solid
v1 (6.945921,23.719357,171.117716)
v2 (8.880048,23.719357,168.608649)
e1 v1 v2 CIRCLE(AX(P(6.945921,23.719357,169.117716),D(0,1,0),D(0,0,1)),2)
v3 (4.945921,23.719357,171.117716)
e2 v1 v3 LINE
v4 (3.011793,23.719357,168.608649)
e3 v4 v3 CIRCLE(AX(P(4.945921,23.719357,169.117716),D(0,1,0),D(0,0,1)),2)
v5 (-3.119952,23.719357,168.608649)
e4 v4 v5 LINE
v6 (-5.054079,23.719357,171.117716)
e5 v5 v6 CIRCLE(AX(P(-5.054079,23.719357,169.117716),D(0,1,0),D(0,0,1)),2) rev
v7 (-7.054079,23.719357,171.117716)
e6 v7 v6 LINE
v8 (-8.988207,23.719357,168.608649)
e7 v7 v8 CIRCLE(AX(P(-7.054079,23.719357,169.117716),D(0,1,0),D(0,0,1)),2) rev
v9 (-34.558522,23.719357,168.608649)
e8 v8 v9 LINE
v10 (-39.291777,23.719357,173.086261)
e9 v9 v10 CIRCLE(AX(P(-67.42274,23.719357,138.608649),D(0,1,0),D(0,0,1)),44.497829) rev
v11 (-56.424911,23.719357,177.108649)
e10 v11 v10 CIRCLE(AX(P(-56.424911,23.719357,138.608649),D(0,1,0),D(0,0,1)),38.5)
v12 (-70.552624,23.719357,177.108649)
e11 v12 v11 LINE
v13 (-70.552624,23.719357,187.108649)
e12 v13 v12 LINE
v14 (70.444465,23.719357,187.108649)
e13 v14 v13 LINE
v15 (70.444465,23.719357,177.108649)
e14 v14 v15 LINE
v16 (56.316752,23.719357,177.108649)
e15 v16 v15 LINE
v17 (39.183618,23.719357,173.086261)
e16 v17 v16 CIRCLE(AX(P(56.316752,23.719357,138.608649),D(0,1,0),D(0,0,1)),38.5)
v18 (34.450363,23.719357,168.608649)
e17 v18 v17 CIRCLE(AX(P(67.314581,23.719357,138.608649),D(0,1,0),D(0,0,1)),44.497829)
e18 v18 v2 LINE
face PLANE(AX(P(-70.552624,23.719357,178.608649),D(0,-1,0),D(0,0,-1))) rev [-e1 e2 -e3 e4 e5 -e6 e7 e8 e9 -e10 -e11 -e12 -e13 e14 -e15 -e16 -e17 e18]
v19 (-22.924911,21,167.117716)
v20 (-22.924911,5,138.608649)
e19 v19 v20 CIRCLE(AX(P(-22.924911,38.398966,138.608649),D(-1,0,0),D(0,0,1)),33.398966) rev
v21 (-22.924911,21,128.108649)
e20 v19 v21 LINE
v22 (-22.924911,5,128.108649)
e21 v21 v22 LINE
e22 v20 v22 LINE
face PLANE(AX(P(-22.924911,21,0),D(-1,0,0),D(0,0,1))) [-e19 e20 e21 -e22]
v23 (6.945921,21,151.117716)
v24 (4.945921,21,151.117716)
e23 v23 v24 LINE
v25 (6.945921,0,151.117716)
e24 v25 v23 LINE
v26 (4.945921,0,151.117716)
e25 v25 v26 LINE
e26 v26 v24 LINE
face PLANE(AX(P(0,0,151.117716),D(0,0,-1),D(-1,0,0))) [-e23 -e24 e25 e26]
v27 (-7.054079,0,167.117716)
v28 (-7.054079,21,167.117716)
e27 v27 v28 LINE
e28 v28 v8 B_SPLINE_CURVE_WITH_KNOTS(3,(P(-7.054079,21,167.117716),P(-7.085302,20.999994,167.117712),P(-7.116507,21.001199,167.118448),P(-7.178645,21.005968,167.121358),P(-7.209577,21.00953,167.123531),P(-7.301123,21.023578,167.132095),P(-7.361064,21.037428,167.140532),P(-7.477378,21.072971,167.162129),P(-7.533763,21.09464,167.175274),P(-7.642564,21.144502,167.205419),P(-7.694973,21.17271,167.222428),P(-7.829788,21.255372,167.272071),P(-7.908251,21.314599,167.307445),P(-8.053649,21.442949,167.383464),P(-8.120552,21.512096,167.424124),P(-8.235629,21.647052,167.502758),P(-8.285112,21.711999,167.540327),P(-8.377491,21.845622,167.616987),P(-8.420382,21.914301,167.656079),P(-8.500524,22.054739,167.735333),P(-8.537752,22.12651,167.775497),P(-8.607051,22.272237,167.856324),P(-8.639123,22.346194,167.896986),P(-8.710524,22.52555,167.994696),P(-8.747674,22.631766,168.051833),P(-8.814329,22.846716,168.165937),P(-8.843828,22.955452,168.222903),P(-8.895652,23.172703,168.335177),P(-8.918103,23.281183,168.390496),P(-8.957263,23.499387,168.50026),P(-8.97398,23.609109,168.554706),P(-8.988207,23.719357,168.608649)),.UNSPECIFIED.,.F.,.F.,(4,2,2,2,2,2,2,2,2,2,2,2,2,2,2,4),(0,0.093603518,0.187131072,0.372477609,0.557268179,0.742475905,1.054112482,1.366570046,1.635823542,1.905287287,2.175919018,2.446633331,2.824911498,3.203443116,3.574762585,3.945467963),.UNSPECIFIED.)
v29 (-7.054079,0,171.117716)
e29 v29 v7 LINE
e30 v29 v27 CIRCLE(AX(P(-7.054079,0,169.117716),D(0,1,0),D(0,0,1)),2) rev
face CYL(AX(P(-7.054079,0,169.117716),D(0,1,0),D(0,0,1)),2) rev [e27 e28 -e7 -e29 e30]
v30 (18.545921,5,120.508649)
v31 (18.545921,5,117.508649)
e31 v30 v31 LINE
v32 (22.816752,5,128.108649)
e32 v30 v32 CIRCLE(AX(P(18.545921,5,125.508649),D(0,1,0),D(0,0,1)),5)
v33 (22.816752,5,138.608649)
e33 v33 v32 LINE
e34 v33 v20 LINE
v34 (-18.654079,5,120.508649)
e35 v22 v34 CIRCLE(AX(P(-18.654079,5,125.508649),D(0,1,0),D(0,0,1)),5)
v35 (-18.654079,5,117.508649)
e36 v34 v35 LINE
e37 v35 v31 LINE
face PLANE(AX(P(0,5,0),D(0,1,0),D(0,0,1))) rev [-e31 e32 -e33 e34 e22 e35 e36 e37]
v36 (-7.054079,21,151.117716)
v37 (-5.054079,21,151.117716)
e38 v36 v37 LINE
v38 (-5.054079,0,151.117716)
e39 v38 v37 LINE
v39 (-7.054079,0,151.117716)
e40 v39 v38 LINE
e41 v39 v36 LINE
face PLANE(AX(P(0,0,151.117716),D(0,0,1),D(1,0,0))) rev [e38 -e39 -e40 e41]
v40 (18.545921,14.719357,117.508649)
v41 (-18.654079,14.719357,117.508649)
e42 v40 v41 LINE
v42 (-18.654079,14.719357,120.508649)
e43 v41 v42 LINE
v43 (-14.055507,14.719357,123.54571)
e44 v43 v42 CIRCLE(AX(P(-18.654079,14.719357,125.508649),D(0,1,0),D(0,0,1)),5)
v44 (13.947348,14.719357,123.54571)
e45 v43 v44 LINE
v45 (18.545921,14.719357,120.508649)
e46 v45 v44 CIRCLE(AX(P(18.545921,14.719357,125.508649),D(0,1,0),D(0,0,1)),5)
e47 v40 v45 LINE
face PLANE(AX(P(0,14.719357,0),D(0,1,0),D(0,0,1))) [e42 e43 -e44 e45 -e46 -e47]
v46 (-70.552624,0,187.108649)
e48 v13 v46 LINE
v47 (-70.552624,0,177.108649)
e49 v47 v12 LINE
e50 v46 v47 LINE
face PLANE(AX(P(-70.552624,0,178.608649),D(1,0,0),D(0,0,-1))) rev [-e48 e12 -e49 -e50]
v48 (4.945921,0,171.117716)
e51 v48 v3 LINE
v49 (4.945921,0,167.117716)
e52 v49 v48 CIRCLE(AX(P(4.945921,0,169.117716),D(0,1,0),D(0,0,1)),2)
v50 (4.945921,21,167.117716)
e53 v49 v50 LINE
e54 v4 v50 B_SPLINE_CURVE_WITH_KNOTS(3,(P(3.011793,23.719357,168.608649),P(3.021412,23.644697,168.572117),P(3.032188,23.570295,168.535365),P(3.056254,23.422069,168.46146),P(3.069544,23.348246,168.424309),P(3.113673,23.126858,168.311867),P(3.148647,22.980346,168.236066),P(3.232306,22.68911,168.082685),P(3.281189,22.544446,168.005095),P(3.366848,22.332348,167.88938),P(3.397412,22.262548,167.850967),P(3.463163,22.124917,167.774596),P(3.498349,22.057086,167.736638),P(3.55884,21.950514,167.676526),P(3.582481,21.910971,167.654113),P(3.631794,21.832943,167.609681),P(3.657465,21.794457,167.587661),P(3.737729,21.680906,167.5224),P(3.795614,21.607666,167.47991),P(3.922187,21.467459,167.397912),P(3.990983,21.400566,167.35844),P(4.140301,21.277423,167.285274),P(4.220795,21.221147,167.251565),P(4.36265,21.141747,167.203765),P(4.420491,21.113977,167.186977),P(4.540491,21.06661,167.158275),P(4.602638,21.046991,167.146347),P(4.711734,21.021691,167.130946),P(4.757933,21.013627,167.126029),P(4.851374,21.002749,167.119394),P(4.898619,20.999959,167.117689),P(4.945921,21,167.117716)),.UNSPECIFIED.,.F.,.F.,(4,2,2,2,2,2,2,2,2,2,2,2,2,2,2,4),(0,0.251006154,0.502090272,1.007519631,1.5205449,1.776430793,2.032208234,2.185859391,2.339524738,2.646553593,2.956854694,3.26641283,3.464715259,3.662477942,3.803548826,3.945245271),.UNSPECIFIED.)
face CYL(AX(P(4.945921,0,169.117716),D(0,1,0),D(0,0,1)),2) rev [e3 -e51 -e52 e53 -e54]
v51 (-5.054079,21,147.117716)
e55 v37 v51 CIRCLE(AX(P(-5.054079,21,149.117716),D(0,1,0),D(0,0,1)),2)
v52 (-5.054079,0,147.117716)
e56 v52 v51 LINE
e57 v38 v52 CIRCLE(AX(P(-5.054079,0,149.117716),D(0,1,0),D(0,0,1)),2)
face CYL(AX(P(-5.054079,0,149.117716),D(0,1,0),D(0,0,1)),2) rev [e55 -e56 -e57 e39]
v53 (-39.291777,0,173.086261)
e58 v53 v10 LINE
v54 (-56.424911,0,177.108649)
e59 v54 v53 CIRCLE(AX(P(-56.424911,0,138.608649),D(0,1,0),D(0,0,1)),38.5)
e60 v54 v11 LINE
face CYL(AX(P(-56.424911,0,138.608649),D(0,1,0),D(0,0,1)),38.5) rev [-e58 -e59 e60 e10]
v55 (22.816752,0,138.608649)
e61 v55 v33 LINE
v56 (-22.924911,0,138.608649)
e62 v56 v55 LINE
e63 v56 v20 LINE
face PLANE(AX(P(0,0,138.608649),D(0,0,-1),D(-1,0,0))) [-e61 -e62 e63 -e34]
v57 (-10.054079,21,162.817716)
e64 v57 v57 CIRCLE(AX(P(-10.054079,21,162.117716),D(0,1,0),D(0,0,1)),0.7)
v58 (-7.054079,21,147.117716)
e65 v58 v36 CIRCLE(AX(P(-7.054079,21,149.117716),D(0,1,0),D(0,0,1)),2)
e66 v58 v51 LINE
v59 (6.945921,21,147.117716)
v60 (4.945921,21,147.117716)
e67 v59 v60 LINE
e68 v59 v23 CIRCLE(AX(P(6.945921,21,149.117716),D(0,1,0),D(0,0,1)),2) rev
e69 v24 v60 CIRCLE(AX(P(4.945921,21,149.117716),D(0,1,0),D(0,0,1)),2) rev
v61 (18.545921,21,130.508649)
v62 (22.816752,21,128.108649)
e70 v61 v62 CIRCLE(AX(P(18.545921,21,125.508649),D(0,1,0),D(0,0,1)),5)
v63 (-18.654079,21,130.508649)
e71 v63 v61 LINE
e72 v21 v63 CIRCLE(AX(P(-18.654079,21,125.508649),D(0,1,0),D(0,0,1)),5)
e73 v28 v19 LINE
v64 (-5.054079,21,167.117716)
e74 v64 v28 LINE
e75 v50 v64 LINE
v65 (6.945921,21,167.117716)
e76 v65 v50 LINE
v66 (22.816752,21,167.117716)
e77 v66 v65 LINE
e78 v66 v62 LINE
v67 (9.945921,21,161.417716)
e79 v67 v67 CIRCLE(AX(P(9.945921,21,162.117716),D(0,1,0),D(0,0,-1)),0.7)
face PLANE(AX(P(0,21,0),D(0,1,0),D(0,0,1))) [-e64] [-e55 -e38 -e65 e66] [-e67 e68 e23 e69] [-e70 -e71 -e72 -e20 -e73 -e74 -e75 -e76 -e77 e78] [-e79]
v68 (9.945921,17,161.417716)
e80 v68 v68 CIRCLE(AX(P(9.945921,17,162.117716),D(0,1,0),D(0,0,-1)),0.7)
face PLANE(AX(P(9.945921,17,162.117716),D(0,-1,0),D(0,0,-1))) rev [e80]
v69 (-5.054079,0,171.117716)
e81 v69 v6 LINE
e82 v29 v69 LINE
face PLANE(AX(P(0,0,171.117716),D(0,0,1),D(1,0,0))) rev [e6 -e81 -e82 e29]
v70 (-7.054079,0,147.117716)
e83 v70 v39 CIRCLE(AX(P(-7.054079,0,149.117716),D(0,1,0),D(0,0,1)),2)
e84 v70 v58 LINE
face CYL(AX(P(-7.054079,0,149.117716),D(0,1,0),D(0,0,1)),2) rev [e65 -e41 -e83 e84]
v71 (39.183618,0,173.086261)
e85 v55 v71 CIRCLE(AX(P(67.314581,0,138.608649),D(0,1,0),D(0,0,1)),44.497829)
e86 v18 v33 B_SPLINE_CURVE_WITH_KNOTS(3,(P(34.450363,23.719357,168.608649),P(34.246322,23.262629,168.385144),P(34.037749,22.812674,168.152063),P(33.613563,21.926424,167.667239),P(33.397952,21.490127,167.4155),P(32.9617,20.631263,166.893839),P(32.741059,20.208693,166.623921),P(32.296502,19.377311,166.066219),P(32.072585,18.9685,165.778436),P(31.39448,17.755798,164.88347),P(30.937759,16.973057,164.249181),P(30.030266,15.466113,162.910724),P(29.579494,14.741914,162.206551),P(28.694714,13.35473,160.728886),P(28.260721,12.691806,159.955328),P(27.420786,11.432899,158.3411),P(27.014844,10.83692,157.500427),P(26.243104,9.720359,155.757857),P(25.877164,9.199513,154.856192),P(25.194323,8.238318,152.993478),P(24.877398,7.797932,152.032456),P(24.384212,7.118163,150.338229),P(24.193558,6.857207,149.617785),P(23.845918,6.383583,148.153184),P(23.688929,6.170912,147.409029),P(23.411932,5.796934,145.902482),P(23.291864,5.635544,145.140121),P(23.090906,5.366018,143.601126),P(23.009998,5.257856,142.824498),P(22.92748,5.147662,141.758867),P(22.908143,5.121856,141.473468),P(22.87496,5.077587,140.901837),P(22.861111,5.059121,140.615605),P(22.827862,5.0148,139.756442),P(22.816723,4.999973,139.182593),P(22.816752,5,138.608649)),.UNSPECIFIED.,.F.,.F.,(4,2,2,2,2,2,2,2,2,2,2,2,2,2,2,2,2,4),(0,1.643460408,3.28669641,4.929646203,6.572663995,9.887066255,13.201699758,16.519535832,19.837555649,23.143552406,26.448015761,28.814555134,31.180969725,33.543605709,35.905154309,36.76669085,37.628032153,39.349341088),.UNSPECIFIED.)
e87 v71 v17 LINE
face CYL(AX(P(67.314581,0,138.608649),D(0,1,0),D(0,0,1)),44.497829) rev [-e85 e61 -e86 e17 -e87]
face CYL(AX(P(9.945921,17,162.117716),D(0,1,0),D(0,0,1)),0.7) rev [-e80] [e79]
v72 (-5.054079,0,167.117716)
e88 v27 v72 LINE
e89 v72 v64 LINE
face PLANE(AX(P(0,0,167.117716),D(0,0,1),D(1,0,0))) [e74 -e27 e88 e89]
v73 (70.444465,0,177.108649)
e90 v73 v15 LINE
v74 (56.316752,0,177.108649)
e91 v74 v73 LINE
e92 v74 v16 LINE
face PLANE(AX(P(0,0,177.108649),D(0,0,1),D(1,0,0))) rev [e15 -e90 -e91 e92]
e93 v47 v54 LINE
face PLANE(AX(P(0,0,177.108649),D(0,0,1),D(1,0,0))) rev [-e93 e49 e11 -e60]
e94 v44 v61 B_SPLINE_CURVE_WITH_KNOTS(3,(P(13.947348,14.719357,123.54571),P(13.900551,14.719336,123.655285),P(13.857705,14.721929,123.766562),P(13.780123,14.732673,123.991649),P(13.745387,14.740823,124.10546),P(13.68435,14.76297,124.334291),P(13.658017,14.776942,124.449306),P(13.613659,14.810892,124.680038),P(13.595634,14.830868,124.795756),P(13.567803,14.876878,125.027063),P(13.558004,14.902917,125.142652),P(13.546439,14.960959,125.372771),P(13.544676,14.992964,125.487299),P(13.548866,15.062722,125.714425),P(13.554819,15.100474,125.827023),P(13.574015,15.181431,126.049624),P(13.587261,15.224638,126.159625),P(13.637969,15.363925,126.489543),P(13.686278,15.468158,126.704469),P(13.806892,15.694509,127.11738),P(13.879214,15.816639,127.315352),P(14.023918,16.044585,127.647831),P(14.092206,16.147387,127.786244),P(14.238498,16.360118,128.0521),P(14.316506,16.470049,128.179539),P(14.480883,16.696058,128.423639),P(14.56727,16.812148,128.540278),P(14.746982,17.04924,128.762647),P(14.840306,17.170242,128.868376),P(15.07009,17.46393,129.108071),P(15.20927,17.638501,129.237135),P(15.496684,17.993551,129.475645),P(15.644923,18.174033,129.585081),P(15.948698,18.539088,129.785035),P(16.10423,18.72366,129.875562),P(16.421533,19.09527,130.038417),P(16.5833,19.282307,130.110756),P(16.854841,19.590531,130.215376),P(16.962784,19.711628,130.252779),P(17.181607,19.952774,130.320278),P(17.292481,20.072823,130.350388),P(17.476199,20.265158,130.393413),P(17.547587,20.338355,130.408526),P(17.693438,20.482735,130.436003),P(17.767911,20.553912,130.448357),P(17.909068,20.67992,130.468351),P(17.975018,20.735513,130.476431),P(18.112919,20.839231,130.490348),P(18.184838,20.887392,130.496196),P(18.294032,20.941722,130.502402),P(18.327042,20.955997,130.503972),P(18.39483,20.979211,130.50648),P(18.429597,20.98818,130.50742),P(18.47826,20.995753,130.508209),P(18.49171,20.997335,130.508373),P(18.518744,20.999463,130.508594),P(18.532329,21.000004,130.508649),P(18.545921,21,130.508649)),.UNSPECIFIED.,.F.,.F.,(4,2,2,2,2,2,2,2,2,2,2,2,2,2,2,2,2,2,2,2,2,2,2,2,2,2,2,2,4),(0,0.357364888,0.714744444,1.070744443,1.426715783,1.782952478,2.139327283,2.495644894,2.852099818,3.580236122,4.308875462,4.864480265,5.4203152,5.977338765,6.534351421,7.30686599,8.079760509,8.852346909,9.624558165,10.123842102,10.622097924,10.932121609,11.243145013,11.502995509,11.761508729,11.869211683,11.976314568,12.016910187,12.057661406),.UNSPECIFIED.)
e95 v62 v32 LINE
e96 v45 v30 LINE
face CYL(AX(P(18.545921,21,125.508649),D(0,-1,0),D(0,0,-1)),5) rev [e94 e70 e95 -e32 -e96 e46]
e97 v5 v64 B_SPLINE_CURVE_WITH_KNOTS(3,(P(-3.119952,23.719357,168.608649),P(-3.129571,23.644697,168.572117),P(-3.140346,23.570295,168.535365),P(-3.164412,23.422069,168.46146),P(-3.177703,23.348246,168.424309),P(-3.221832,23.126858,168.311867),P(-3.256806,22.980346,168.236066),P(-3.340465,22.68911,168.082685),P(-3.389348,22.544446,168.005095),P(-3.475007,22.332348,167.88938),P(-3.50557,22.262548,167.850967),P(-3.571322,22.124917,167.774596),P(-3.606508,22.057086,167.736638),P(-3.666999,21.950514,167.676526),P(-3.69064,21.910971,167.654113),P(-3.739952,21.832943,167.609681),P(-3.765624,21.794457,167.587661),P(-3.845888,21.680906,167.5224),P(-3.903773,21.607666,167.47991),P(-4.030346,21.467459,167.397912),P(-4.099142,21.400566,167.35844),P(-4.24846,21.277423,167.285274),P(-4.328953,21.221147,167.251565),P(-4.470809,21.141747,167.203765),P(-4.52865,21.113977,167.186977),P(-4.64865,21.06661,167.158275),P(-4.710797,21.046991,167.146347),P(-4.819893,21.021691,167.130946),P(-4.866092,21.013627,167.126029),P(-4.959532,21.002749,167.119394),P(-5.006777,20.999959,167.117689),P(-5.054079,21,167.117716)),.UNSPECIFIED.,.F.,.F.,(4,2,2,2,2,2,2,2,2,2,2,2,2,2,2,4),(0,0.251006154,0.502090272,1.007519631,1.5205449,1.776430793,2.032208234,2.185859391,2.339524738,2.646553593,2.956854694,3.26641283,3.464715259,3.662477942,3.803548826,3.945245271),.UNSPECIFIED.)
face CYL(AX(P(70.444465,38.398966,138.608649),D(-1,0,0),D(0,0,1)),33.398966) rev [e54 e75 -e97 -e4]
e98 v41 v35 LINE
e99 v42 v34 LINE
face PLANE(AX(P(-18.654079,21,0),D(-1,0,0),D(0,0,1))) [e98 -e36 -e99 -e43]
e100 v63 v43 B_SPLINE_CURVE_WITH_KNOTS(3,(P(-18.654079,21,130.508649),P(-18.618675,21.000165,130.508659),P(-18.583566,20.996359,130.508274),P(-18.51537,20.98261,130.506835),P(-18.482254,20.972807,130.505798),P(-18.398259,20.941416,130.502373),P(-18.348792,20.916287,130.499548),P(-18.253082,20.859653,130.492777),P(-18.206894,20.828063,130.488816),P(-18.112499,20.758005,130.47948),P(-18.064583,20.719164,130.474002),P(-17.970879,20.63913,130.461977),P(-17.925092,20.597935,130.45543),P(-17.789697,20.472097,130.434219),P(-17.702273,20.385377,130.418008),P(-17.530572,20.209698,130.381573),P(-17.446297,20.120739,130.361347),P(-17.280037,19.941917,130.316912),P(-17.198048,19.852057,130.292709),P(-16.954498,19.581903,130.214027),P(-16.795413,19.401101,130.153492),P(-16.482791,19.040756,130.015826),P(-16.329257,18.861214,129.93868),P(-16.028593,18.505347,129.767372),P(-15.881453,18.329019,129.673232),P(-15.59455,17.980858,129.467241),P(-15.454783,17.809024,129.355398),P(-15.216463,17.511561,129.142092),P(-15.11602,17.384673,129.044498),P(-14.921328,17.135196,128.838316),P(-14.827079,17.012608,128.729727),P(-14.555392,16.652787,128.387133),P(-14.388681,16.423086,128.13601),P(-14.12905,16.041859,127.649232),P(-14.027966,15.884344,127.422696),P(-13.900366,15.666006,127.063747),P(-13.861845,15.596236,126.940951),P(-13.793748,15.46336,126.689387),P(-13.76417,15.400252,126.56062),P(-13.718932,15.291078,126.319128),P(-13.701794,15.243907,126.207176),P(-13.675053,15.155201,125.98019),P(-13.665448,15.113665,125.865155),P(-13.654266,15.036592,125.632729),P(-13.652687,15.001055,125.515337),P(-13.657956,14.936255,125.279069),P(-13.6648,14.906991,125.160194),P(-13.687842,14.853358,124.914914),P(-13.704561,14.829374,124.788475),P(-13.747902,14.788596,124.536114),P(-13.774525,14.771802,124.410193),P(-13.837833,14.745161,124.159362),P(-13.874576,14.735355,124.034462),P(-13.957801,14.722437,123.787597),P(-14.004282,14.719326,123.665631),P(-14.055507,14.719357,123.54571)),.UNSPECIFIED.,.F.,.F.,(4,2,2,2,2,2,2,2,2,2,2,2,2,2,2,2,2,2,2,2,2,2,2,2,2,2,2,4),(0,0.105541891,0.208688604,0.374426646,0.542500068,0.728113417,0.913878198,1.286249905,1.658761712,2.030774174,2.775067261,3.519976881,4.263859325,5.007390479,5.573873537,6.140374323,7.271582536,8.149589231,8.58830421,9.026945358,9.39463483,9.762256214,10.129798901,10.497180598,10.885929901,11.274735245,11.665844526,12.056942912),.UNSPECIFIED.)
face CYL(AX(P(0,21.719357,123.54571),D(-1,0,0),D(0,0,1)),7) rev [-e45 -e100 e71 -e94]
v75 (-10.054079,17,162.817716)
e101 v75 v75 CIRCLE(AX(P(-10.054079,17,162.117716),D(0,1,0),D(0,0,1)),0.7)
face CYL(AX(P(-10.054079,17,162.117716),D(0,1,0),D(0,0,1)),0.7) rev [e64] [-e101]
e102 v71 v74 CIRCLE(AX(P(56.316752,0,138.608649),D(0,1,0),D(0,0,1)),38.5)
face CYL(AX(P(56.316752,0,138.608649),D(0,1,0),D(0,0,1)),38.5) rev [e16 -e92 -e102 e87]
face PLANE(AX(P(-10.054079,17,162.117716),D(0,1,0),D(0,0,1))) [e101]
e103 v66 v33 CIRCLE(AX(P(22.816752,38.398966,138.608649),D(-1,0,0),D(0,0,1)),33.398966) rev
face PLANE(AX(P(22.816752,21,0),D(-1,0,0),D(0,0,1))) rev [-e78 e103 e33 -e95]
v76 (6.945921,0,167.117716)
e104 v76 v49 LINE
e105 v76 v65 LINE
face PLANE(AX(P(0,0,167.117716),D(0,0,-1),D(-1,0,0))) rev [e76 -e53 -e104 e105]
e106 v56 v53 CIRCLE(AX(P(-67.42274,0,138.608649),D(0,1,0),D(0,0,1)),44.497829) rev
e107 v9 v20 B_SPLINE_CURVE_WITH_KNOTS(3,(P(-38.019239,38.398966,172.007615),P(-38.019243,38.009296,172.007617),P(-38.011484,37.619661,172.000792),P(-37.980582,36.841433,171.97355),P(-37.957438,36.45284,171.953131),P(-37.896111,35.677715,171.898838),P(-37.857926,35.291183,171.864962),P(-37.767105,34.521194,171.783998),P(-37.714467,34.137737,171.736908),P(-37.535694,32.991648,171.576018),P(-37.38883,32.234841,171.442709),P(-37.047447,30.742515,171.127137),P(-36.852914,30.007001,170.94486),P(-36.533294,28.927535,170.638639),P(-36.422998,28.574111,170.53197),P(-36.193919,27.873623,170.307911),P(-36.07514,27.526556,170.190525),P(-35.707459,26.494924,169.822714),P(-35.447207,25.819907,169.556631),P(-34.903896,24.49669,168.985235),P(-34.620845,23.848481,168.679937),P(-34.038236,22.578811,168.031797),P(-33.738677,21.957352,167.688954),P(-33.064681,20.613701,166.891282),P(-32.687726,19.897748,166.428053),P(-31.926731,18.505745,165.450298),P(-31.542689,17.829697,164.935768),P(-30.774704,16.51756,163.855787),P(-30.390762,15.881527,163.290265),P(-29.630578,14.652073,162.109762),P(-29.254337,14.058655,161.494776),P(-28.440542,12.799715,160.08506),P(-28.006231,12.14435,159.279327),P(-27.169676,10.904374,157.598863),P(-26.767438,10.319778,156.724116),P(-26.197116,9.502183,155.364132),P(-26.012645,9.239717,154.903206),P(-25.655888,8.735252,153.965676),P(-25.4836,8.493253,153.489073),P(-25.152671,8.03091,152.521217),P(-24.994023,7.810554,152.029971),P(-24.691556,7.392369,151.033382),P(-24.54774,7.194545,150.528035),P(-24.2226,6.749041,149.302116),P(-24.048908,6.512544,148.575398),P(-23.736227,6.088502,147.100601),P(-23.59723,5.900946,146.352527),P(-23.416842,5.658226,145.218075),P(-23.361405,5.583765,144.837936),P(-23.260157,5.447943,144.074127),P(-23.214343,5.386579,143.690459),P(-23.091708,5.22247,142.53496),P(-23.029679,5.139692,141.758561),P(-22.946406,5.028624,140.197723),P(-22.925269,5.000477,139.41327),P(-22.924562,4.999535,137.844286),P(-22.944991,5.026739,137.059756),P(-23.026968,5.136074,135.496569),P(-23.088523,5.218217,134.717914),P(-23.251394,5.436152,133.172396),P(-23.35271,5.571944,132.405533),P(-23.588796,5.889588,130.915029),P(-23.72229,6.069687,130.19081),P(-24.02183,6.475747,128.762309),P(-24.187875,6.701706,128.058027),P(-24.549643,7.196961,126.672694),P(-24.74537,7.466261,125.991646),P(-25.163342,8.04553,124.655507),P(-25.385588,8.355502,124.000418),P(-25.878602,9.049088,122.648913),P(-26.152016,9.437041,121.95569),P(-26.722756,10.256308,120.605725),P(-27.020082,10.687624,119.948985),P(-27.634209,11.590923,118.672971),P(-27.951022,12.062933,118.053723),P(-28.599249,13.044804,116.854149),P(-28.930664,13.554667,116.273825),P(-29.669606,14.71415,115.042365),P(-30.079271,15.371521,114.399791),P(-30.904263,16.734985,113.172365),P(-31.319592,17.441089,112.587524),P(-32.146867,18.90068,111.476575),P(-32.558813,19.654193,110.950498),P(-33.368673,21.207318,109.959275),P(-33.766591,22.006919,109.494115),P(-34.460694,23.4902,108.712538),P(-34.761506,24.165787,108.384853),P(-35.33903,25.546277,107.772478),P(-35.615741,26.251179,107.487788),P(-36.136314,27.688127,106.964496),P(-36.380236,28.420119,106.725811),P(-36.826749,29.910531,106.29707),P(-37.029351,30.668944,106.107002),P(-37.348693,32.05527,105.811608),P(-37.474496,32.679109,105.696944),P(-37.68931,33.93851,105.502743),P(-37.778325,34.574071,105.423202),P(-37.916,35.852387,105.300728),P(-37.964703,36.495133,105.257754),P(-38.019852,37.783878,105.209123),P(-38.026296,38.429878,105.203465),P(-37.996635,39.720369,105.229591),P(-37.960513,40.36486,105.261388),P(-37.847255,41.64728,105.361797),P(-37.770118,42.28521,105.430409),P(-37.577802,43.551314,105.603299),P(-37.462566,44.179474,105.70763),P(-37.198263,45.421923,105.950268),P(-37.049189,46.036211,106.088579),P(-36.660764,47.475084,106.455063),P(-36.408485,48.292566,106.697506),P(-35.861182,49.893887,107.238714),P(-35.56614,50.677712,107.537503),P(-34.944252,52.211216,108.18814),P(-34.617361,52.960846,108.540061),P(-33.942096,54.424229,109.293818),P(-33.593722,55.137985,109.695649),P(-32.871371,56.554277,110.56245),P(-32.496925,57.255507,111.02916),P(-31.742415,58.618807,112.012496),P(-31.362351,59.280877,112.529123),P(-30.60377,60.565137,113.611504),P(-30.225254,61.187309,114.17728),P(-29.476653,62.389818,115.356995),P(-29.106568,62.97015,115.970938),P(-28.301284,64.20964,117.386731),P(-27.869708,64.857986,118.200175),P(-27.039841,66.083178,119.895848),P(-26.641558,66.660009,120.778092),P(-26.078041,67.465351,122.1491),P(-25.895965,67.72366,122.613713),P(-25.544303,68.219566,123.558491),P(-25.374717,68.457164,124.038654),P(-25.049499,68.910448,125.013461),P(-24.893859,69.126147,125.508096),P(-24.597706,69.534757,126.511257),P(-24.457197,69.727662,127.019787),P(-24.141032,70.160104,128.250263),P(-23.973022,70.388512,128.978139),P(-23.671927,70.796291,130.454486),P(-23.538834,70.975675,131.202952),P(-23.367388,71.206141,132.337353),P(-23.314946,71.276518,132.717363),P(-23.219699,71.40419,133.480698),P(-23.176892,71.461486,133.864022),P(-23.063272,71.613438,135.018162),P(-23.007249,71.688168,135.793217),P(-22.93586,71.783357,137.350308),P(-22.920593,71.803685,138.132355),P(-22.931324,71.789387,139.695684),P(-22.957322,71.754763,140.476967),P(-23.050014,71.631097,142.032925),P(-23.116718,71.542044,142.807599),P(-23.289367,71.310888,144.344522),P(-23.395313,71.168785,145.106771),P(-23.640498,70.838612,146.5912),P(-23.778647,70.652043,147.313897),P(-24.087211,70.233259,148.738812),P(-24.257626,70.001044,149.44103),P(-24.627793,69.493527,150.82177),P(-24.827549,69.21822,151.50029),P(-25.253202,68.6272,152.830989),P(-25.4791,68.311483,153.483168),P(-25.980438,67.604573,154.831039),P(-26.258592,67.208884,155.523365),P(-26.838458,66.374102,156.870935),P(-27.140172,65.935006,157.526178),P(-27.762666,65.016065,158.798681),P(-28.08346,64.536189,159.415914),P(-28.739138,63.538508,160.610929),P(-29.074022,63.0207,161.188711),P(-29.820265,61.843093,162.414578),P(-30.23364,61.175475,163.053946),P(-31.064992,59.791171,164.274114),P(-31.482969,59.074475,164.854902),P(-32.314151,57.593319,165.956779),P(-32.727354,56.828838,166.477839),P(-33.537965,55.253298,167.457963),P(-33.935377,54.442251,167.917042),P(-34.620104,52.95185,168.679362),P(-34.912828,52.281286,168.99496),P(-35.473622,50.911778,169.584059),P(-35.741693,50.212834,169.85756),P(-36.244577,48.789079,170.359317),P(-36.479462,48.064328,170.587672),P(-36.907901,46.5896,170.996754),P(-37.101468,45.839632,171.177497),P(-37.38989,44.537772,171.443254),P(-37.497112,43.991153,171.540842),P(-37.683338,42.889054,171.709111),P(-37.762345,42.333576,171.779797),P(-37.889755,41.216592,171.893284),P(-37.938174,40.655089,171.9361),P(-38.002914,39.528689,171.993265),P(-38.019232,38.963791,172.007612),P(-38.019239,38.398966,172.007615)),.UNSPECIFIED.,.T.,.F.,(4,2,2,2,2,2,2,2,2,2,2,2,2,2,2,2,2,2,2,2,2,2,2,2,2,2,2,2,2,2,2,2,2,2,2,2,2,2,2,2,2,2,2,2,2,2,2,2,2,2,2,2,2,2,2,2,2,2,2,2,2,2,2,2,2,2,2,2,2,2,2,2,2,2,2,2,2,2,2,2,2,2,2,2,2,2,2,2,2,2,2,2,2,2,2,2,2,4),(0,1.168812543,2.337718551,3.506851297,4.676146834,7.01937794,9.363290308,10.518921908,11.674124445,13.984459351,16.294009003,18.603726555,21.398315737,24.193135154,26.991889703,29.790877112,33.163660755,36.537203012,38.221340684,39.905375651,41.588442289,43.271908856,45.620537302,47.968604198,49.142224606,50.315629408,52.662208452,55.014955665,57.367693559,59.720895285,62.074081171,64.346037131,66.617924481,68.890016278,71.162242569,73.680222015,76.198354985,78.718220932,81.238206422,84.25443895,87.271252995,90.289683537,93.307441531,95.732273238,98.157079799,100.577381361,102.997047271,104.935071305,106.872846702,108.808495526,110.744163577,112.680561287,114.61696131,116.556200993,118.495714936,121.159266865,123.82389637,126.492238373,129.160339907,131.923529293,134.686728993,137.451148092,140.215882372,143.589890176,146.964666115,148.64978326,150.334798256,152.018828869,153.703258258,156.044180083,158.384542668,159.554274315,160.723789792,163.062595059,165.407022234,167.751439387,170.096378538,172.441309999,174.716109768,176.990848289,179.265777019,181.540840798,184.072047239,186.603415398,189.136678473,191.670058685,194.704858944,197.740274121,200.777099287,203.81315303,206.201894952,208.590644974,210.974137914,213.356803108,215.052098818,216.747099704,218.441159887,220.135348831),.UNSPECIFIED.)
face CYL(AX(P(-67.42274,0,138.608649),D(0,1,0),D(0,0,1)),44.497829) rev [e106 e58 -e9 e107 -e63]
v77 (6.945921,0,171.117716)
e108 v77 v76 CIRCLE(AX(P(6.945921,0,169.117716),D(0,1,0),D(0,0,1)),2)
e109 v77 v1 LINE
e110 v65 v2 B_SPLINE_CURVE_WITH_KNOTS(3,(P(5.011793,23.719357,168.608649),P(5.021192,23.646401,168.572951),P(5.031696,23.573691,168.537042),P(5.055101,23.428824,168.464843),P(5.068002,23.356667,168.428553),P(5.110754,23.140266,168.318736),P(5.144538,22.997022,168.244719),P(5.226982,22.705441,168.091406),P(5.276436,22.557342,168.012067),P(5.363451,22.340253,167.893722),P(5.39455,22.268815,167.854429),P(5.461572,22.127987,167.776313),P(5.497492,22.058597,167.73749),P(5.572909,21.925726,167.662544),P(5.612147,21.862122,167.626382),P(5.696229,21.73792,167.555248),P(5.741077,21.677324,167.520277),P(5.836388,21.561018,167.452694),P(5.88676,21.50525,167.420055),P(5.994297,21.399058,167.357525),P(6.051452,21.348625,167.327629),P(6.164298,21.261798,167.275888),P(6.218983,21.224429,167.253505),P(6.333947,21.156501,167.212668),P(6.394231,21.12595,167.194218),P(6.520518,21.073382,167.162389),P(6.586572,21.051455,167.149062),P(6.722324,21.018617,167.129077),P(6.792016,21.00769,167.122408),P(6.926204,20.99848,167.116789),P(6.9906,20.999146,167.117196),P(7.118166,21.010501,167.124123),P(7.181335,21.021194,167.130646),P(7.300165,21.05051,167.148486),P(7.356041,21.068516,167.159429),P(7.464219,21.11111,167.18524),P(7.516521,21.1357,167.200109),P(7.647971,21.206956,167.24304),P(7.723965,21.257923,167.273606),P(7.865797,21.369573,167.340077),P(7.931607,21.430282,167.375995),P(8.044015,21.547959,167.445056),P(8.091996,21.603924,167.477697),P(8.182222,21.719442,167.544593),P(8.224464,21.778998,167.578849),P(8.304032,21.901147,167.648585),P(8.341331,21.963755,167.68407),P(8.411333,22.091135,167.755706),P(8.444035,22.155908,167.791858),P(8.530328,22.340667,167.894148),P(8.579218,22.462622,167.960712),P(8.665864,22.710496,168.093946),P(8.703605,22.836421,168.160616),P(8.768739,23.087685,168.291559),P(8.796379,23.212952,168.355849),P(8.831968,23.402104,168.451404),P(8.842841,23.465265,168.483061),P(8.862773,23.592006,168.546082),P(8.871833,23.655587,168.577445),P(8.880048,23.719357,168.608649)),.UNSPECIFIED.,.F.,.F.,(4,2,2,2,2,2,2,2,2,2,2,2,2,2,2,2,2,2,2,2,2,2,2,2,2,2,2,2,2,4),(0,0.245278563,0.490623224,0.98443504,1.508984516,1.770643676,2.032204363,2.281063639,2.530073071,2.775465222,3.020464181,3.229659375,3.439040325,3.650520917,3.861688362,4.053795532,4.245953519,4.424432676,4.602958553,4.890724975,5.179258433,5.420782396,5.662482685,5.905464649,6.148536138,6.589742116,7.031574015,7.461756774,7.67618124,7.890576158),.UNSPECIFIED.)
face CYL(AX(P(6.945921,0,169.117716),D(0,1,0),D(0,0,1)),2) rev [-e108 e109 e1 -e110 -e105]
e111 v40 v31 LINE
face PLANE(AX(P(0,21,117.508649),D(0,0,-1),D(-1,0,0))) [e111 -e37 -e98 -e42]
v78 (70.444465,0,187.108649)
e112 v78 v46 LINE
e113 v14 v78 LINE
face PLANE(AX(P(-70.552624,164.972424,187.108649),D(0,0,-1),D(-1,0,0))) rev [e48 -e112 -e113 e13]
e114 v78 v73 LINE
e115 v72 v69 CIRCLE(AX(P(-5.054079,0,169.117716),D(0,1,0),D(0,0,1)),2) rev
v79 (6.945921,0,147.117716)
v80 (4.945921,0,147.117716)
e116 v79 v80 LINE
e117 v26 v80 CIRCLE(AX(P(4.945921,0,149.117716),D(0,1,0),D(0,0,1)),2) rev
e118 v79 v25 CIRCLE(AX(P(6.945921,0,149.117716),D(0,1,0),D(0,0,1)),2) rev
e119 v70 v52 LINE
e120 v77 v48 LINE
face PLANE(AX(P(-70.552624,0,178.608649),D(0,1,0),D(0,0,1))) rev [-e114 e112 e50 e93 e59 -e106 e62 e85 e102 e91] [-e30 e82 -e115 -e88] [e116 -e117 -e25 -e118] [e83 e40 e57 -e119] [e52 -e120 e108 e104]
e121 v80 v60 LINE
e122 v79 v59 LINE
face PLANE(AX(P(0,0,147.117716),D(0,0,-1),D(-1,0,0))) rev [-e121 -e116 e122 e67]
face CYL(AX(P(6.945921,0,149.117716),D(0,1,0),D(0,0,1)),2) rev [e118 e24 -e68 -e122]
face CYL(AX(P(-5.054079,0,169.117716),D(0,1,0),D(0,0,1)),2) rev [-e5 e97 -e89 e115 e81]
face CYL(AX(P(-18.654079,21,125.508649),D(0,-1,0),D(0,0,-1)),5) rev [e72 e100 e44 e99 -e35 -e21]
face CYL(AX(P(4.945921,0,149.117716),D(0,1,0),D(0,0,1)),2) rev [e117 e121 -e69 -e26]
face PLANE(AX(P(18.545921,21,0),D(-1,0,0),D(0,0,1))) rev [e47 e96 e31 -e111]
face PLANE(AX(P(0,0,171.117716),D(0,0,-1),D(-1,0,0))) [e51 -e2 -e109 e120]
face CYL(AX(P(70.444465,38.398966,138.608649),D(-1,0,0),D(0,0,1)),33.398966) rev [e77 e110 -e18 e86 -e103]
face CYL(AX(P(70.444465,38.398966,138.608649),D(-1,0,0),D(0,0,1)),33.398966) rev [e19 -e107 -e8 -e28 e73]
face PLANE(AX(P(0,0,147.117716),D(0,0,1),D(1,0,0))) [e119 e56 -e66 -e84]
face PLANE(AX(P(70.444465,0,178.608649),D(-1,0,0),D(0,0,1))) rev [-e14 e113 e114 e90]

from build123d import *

# Parameters (mm, degrees)
SKETCH2_W                       = 140.99708831
SKETCH2_H                       = 23.719356628
BOSS_EXTRUDE1_DEPTH             = 40
CUT_EXTRUDE1_DEPTH              = 229.787753821
BOSS_EXTRUDE2_DEPTH             = 16
CUT_EXTRUDE2_START              = -9
CUT_EXTRUDE2_DEPTH              = 9
FILLET1_R                       = 7
CUT_EXTRUDE3_DEPTH              = 194.183131235
CUT_EXTRUDE3_DEPTH_BACK         = 194.183131235
CUT_EXTRUDE4_DEPTH              = 194.497622924
BOSS_EXTRUDE4_REACH             = 195.183
SKETCH11_W                      = 140.99708831
SKETCH11_H                      = 8.5
BOSS_EXTRUDE4_DIRECTION_2_REACH = 195.183
SKETCH14_R                      = 0.7
CUT_EXTRUDE6_DEPTH              = 4
CUT_EXTRUDE7_DEPTH              = 202.370124673


with BuildPart() as part:
    # Sketch2 → Boss-Extrude1 (new body)
    with BuildSketch(Plane.XY.offset(138.608649029)):
        with Locations((-0.054079367, 11.859678314)):
            Rectangle(SKETCH2_W, SKETCH2_H)
    extrude(amount=BOSS_EXTRUDE1_DEPTH)

    # Sketch3 → Cut-Extrude1 (cut, through all)
    with BuildSketch(Plane.ZY.offset(70.552623522)):
        with BuildLine():
            Line((168.608649029, 23.719356628), (158.608649029, 23.719356628))
            Line((158.608649029, 23.719356628), (138.608649029, 23.719356628))
            Line((138.608649029, 23.719356628), (138.608649029, 5))
            ThreePointArc((138.608649029, 5), (156.289247948, 10.063699068), (168.608649029, 23.719356628))
        make_face()
    extrude(amount=-CUT_EXTRUDE1_DEPTH, mode=Mode.SUBTRACT)

    # Sketch4 → Boss-Extrude2 (add)
    with BuildSketch(Plane(origin=(0, 5, 0), x_dir=(1, 0, 0), z_dir=(0, 1, 0))):
        with BuildLine():
            Line((-22.924910668, -128.108649029), (-22.924910668, -168.608649029))
            Line((-22.924910668, -168.608649029), (-0.054079367, -168.608649029))
            Line((-0.054079367, -168.608649029), (22.816751934, -168.608649029))
            Line((22.816751934, -168.608649029), (22.816751934, -128.108649029))
            ThreePointArc((22.816751934, -128.108649029), (14.187021689, -127.958138772), (18.545920633, -120.508649029))
            Line((18.545920633, -120.508649029), (18.545920633, -117.508649029))
            Line((18.545920633, -117.508649029), (-18.654079367, -117.508649029))
            Line((-18.654079367, -117.508649029), (-18.654079367, -120.508649029))
            ThreePointArc((-18.654079367, -120.508649029), (-15.118545461, -121.973115123), (-13.654079367, -125.508649029))
            ThreePointArc((-13.654079367, -125.508649029), (-17.303923173, -130.322906838), (-22.924910668, -128.108649029))
        make_face()
    extrude(amount=BOSS_EXTRUDE2_DEPTH)

    # Sketch6 → Cut-Extrude2 (cut)
    with BuildSketch(Plane(origin=(0, 23.719356628, 0), x_dir=(1, 0, 0), z_dir=(0, 1, 0)).offset(CUT_EXTRUDE2_START)):
        with BuildLine():
            ThreePointArc((-18.654079367, -120.508649029), (-13.654079367, -125.508649029), (-18.654079367, -130.508649029))
            Line((-18.654079367, -130.508649029), (18.545920633, -130.508649029))
            ThreePointArc((18.545920633, -130.508649029), (13.545920633, -125.508649029), (18.545920633, -120.508649029))
            Line((18.545920633, -120.508649029), (18.545920633, -117.508649029))
            Line((18.545920633, -117.508649029), (-18.654079367, -117.508649029))
            Line((-18.654079367, -117.508649029), (-18.654079367, -120.508649029))
        make_face()
    extrude(amount=CUT_EXTRUDE2_DEPTH, mode=Mode.SUBTRACT)

    # Fillet1
    # the kernel refuses this fillet: 7 mm, written as the material it adds along each edge
    with BuildSketch(Plane(origin=(-36.061428038, 14.719356628, 130.508649029), x_dir=(0, 1, 0), z_dir=(1, 0, 0))) as fillet1_piece_1_section:
        with BuildLine():
            CenterArc((7, -6.962939469), FILLET1_R, 95.898427251, 84.101572749)
            Line((0, -6.962939469), (0, 0))
            Line((0, 0), (6.280643372, 0))
        make_face()
    fillet1_piece_1 = extrude(amount=72.014697343, mode=Mode.PRIVATE)
    fillet1_piece_1 = split(fillet1_piece_1, bisect_by=Plane(origin=(22.816751934, 16.511100944, 128.243610021), z_dir=(-1, 0, 0)), keep=Keep.TOP, mode=Mode.PRIVATE)
    fillet1_piece_1 = split(fillet1_piece_1, bisect_by=Plane(origin=(-22.924910668, 16.511100944, 128.243610021), z_dir=(1, 0, 0)), keep=Keep.TOP, mode=Mode.PRIVATE)
    fillet1_piece_1 = fillet1_piece_1 - Plane(origin=(18.545920633, 16.511100944, 125.508649029), x_dir=(0.854166260162501, 0, 0.5200000000000065), z_dir=(0, -1, 0)) * Cylinder(5, 172, mode=Mode.PRIVATE)
    fillet1_piece_1 = fillet1_piece_1 - Plane(origin=(-18.654079367, 16.511100944, 125.508649029), x_dir=(0, 0, -1), z_dir=(0, -1, 0)) * Cylinder(5, 172, mode=Mode.PRIVATE)
    add(fillet1_piece_1)

    # Sketch10 → Cut-Extrude3 (cut, two sides: drawn at the far end of the back side and taken through both)
    with BuildSketch(Plane(origin=(0, 21, 0), x_dir=(1, 0, 0), z_dir=(0, 1, 0)).offset(-CUT_EXTRUDE3_DEPTH_BACK)):
        with BuildLine():
            Line((-70.552623522, -168.608649029), (-70.552623522, -172.108649029))
            Line((-70.552623522, -172.108649029), (-56.424910668, -172.108649029))
            ThreePointArc((-56.424910668, -172.108649029), (-32.736833498, -162.296726199), (-22.924910668, -138.608649029))
            Line((-22.924910668, -138.608649029), (-70.552623522, -138.608649029))
            Line((-70.552623522, -138.608649029), (-70.552623522, -168.608649029))
        make_face()
        with BuildLine():
            ThreePointArc((22.816751934, -138.608649029), (32.628674764, -162.296726199), (56.316751934, -172.108649029))
            Line((56.316751934, -172.108649029), (70.444464788, -172.108649029))
            Line((70.444464788, -172.108649029), (70.444464788, -168.608649029))
            Line((70.444464788, -168.608649029), (70.444464788, -138.608649029))
            Line((70.444464788, -138.608649029), (22.816751934, -138.608649029))
        make_face()
    extrude(amount=CUT_EXTRUDE3_DEPTH + CUT_EXTRUDE3_DEPTH_BACK, mode=Mode.SUBTRACT)

    # Sketch12 → Cut-Extrude4 (cut, through all)
    with BuildSketch(Plane(origin=(0, 23.719356628, 0), x_dir=(1, 0, 0), z_dir=(0, 1, 0))):
        with BuildLine():
            ThreePointArc((39.183618102, -173.086260969), (47.517265008, -176.089564571), (56.316751934, -177.108649029))
            Line((56.316751934, -177.108649029), (70.444464788, -177.108649029))
            Line((70.444464788, -177.108649029), (70.444464788, -172.108649029))
            Line((70.444464788, -172.108649029), (56.316751934, -172.108649029))
            ThreePointArc((56.316751934, -172.108649029), (32.628674764, -162.296726199), (22.816751934, -138.608649029))
            ThreePointArc((22.816751934, -138.608649029), (27.116175744, -157.691232929), (39.183618102, -173.086260969))
        make_face()
        with BuildLine():
            Line((-70.552623522, -172.108649029), (-70.552623522, -177.108649029))
            Line((-70.552623522, -177.108649029), (-56.424910668, -177.108649029))
            ThreePointArc((-56.424910668, -177.108649029), (-47.625423742, -176.089564571), (-39.291776836, -173.086260969))
            ThreePointArc((-39.291776836, -173.086260969), (-27.224334478, -157.691232929), (-22.924910668, -138.608649029))
            ThreePointArc((-22.924910668, -138.608649029), (-32.736833498, -162.296726199), (-56.424910668, -172.108649029))
            Line((-56.424910668, -172.108649029), (-70.552623522, -172.108649029))
        make_face()
    extrude(amount=-CUT_EXTRUDE4_DEPTH, mode=Mode.SUBTRACT)

    # Boss-Extrude4: up to this face of the body (flat: up to its plane)
    boss_extrude4_end = Plane(part.part.faces().sort_by_distance((-0.054079367, 23.719356628, 174.251451193))[0])
    # Sketch11 → Boss-Extrude4 (add, up to the picked face)
    with BuildSketch(Plane(origin=(0, 21, 0), x_dir=(1, 0, 0), z_dir=(0, 1, 0)), mode=Mode.PRIVATE) as boss_extrude4_sk1:
        with Locations((-0.054079367, -182.858649029)):
            Rectangle(SKETCH11_W, SKETCH11_H)
    boss_extrude4_tool1 = split(extrude(boss_extrude4_sk1.sketch, amount=BOSS_EXTRUDE4_REACH, mode=Mode.PRIVATE), bisect_by=boss_extrude4_end, keep=Keep.BOTH, mode=Mode.PRIVATE)
    add(boss_extrude4_tool1.solids().sort_by(Axis((-0.054079, 21, 182.858649), (0, 1, 0)))[0])

    # Boss-Extrude4 direction 2: up to this face of the body (flat: up to its plane)
    boss_extrude4_direction_2_end = Plane(part.part.faces().sort_by_distance((-0.054079367, 0, 161.750198619))[0])
    # Sketch11 → Boss-Extrude4 direction 2 (add, up to the picked face)
    with BuildSketch(Plane(origin=(0, 21, 0), x_dir=(1, 0, 0), z_dir=(0, 1, 0)), mode=Mode.PRIVATE) as boss_extrude4_direction_2_sk1:
        with Locations((-0.054079367, -182.858649029)):
            Rectangle(SKETCH11_W, SKETCH11_H)
    boss_extrude4_direction_2_tool1 = split(extrude(boss_extrude4_direction_2_sk1.sketch, amount=-BOSS_EXTRUDE4_DIRECTION_2_REACH, mode=Mode.PRIVATE), bisect_by=boss_extrude4_direction_2_end, keep=Keep.BOTH, mode=Mode.PRIVATE)
    add(boss_extrude4_direction_2_tool1.solids().sort_by(Axis((-0.054079, 21, 182.858649), (0, -1, 0)))[0])

    # Sketch14 → Cut-Extrude6 (cut)
    with BuildSketch(Plane(origin=(0, 21, 0), x_dir=(1, 0, 0), z_dir=(0, 1, 0))):
        with Locations(Location((-10.054079367, -162.11771624, 0), (0, 0, 270))):
            Circle(SKETCH14_R)
        with Locations(Location((9.945920633, -162.11771624, 0), (0, 0, 90))):
            Circle(SKETCH14_R)
    extrude(amount=-CUT_EXTRUDE6_DEPTH, mode=Mode.SUBTRACT)

    # Sketch16 → Cut-Extrude7 (cut, through all)
    with BuildSketch(Plane(origin=(0, 23.719356628, 0), x_dir=(1, 0, 0), z_dir=(0, 1, 0))):
        with BuildLine():
            Line((-7.054079367, -151.11771624), (-5.054079367, -151.11771624))
            ThreePointArc((-5.054079367, -151.11771624), (-3.054079367, -149.11771624), (-5.054079367, -147.11771624))
            Line((-5.054079367, -147.11771624), (-7.054079367, -147.11771624))
            ThreePointArc((-7.054079367, -147.11771624), (-9.054079367, -149.11771624), (-7.054079367, -151.11771624))
        make_face()
        with BuildLine():
            ThreePointArc((4.945920633, -151.11771624), (2.945920633, -149.11771624), (4.945920633, -147.11771624))
            Line((4.945920633, -147.11771624), (6.945920633, -147.11771624))
            ThreePointArc((6.945920633, -147.11771624), (8.945920633, -149.11771624), (6.945920633, -151.11771624))
            Line((6.945920633, -151.11771624), (4.945920633, -151.11771624))
        make_face()
        with BuildLine():
            Line((4.945920633, -171.11771624), (6.945920633, -171.11771624))
            ThreePointArc((6.945920633, -171.11771624), (8.529924172, -170.338753827), (8.880048492, -168.608649029))
            Line((8.880048492, -168.608649029), (3.011792774, -168.608649029))
            ThreePointArc((3.011792774, -168.608649029), (3.361917094, -170.338753827), (4.945920633, -171.11771624))
        make_face()
        with BuildLine():
            Line((3.011792774, -168.608649029), (8.880048492, -168.608649029))
            ThreePointArc((8.880048492, -168.608649029), (8.16695822, -167.533712701), (6.945920633, -167.11771624))
            Line((6.945920633, -167.11771624), (4.945920633, -167.11771624))
            ThreePointArc((4.945920633, -167.11771624), (3.724883046, -167.533712701), (3.011792774, -168.608649029))
        make_face()
        with BuildLine():
            Line((-8.988207226, -168.608649029), (-3.119951508, -168.608649029))
            ThreePointArc((-3.119951508, -168.608649029), (-3.83304178, -167.533712701), (-5.054079367, -167.11771624))
            Line((-5.054079367, -167.11771624), (-7.054079367, -167.11771624))
            ThreePointArc((-7.054079367, -167.11771624), (-8.275116954, -167.533712701), (-8.988207226, -168.608649029))
        make_face()
        with BuildLine():
            ThreePointArc((-5.054079367, -171.11771624), (-3.470075828, -170.338753827), (-3.119951508, -168.608649029))
            Line((-3.119951508, -168.608649029), (-8.988207226, -168.608649029))
            ThreePointArc((-8.988207226, -168.608649029), (-8.638082906, -170.338753827), (-7.054079367, -171.11771624))
            Line((-7.054079367, -171.11771624), (-5.054079367, -171.11771624))
        make_face()
    extrude(amount=-CUT_EXTRUDE7_DEPTH, mode=Mode.SUBTRACT)


solid = part.part
